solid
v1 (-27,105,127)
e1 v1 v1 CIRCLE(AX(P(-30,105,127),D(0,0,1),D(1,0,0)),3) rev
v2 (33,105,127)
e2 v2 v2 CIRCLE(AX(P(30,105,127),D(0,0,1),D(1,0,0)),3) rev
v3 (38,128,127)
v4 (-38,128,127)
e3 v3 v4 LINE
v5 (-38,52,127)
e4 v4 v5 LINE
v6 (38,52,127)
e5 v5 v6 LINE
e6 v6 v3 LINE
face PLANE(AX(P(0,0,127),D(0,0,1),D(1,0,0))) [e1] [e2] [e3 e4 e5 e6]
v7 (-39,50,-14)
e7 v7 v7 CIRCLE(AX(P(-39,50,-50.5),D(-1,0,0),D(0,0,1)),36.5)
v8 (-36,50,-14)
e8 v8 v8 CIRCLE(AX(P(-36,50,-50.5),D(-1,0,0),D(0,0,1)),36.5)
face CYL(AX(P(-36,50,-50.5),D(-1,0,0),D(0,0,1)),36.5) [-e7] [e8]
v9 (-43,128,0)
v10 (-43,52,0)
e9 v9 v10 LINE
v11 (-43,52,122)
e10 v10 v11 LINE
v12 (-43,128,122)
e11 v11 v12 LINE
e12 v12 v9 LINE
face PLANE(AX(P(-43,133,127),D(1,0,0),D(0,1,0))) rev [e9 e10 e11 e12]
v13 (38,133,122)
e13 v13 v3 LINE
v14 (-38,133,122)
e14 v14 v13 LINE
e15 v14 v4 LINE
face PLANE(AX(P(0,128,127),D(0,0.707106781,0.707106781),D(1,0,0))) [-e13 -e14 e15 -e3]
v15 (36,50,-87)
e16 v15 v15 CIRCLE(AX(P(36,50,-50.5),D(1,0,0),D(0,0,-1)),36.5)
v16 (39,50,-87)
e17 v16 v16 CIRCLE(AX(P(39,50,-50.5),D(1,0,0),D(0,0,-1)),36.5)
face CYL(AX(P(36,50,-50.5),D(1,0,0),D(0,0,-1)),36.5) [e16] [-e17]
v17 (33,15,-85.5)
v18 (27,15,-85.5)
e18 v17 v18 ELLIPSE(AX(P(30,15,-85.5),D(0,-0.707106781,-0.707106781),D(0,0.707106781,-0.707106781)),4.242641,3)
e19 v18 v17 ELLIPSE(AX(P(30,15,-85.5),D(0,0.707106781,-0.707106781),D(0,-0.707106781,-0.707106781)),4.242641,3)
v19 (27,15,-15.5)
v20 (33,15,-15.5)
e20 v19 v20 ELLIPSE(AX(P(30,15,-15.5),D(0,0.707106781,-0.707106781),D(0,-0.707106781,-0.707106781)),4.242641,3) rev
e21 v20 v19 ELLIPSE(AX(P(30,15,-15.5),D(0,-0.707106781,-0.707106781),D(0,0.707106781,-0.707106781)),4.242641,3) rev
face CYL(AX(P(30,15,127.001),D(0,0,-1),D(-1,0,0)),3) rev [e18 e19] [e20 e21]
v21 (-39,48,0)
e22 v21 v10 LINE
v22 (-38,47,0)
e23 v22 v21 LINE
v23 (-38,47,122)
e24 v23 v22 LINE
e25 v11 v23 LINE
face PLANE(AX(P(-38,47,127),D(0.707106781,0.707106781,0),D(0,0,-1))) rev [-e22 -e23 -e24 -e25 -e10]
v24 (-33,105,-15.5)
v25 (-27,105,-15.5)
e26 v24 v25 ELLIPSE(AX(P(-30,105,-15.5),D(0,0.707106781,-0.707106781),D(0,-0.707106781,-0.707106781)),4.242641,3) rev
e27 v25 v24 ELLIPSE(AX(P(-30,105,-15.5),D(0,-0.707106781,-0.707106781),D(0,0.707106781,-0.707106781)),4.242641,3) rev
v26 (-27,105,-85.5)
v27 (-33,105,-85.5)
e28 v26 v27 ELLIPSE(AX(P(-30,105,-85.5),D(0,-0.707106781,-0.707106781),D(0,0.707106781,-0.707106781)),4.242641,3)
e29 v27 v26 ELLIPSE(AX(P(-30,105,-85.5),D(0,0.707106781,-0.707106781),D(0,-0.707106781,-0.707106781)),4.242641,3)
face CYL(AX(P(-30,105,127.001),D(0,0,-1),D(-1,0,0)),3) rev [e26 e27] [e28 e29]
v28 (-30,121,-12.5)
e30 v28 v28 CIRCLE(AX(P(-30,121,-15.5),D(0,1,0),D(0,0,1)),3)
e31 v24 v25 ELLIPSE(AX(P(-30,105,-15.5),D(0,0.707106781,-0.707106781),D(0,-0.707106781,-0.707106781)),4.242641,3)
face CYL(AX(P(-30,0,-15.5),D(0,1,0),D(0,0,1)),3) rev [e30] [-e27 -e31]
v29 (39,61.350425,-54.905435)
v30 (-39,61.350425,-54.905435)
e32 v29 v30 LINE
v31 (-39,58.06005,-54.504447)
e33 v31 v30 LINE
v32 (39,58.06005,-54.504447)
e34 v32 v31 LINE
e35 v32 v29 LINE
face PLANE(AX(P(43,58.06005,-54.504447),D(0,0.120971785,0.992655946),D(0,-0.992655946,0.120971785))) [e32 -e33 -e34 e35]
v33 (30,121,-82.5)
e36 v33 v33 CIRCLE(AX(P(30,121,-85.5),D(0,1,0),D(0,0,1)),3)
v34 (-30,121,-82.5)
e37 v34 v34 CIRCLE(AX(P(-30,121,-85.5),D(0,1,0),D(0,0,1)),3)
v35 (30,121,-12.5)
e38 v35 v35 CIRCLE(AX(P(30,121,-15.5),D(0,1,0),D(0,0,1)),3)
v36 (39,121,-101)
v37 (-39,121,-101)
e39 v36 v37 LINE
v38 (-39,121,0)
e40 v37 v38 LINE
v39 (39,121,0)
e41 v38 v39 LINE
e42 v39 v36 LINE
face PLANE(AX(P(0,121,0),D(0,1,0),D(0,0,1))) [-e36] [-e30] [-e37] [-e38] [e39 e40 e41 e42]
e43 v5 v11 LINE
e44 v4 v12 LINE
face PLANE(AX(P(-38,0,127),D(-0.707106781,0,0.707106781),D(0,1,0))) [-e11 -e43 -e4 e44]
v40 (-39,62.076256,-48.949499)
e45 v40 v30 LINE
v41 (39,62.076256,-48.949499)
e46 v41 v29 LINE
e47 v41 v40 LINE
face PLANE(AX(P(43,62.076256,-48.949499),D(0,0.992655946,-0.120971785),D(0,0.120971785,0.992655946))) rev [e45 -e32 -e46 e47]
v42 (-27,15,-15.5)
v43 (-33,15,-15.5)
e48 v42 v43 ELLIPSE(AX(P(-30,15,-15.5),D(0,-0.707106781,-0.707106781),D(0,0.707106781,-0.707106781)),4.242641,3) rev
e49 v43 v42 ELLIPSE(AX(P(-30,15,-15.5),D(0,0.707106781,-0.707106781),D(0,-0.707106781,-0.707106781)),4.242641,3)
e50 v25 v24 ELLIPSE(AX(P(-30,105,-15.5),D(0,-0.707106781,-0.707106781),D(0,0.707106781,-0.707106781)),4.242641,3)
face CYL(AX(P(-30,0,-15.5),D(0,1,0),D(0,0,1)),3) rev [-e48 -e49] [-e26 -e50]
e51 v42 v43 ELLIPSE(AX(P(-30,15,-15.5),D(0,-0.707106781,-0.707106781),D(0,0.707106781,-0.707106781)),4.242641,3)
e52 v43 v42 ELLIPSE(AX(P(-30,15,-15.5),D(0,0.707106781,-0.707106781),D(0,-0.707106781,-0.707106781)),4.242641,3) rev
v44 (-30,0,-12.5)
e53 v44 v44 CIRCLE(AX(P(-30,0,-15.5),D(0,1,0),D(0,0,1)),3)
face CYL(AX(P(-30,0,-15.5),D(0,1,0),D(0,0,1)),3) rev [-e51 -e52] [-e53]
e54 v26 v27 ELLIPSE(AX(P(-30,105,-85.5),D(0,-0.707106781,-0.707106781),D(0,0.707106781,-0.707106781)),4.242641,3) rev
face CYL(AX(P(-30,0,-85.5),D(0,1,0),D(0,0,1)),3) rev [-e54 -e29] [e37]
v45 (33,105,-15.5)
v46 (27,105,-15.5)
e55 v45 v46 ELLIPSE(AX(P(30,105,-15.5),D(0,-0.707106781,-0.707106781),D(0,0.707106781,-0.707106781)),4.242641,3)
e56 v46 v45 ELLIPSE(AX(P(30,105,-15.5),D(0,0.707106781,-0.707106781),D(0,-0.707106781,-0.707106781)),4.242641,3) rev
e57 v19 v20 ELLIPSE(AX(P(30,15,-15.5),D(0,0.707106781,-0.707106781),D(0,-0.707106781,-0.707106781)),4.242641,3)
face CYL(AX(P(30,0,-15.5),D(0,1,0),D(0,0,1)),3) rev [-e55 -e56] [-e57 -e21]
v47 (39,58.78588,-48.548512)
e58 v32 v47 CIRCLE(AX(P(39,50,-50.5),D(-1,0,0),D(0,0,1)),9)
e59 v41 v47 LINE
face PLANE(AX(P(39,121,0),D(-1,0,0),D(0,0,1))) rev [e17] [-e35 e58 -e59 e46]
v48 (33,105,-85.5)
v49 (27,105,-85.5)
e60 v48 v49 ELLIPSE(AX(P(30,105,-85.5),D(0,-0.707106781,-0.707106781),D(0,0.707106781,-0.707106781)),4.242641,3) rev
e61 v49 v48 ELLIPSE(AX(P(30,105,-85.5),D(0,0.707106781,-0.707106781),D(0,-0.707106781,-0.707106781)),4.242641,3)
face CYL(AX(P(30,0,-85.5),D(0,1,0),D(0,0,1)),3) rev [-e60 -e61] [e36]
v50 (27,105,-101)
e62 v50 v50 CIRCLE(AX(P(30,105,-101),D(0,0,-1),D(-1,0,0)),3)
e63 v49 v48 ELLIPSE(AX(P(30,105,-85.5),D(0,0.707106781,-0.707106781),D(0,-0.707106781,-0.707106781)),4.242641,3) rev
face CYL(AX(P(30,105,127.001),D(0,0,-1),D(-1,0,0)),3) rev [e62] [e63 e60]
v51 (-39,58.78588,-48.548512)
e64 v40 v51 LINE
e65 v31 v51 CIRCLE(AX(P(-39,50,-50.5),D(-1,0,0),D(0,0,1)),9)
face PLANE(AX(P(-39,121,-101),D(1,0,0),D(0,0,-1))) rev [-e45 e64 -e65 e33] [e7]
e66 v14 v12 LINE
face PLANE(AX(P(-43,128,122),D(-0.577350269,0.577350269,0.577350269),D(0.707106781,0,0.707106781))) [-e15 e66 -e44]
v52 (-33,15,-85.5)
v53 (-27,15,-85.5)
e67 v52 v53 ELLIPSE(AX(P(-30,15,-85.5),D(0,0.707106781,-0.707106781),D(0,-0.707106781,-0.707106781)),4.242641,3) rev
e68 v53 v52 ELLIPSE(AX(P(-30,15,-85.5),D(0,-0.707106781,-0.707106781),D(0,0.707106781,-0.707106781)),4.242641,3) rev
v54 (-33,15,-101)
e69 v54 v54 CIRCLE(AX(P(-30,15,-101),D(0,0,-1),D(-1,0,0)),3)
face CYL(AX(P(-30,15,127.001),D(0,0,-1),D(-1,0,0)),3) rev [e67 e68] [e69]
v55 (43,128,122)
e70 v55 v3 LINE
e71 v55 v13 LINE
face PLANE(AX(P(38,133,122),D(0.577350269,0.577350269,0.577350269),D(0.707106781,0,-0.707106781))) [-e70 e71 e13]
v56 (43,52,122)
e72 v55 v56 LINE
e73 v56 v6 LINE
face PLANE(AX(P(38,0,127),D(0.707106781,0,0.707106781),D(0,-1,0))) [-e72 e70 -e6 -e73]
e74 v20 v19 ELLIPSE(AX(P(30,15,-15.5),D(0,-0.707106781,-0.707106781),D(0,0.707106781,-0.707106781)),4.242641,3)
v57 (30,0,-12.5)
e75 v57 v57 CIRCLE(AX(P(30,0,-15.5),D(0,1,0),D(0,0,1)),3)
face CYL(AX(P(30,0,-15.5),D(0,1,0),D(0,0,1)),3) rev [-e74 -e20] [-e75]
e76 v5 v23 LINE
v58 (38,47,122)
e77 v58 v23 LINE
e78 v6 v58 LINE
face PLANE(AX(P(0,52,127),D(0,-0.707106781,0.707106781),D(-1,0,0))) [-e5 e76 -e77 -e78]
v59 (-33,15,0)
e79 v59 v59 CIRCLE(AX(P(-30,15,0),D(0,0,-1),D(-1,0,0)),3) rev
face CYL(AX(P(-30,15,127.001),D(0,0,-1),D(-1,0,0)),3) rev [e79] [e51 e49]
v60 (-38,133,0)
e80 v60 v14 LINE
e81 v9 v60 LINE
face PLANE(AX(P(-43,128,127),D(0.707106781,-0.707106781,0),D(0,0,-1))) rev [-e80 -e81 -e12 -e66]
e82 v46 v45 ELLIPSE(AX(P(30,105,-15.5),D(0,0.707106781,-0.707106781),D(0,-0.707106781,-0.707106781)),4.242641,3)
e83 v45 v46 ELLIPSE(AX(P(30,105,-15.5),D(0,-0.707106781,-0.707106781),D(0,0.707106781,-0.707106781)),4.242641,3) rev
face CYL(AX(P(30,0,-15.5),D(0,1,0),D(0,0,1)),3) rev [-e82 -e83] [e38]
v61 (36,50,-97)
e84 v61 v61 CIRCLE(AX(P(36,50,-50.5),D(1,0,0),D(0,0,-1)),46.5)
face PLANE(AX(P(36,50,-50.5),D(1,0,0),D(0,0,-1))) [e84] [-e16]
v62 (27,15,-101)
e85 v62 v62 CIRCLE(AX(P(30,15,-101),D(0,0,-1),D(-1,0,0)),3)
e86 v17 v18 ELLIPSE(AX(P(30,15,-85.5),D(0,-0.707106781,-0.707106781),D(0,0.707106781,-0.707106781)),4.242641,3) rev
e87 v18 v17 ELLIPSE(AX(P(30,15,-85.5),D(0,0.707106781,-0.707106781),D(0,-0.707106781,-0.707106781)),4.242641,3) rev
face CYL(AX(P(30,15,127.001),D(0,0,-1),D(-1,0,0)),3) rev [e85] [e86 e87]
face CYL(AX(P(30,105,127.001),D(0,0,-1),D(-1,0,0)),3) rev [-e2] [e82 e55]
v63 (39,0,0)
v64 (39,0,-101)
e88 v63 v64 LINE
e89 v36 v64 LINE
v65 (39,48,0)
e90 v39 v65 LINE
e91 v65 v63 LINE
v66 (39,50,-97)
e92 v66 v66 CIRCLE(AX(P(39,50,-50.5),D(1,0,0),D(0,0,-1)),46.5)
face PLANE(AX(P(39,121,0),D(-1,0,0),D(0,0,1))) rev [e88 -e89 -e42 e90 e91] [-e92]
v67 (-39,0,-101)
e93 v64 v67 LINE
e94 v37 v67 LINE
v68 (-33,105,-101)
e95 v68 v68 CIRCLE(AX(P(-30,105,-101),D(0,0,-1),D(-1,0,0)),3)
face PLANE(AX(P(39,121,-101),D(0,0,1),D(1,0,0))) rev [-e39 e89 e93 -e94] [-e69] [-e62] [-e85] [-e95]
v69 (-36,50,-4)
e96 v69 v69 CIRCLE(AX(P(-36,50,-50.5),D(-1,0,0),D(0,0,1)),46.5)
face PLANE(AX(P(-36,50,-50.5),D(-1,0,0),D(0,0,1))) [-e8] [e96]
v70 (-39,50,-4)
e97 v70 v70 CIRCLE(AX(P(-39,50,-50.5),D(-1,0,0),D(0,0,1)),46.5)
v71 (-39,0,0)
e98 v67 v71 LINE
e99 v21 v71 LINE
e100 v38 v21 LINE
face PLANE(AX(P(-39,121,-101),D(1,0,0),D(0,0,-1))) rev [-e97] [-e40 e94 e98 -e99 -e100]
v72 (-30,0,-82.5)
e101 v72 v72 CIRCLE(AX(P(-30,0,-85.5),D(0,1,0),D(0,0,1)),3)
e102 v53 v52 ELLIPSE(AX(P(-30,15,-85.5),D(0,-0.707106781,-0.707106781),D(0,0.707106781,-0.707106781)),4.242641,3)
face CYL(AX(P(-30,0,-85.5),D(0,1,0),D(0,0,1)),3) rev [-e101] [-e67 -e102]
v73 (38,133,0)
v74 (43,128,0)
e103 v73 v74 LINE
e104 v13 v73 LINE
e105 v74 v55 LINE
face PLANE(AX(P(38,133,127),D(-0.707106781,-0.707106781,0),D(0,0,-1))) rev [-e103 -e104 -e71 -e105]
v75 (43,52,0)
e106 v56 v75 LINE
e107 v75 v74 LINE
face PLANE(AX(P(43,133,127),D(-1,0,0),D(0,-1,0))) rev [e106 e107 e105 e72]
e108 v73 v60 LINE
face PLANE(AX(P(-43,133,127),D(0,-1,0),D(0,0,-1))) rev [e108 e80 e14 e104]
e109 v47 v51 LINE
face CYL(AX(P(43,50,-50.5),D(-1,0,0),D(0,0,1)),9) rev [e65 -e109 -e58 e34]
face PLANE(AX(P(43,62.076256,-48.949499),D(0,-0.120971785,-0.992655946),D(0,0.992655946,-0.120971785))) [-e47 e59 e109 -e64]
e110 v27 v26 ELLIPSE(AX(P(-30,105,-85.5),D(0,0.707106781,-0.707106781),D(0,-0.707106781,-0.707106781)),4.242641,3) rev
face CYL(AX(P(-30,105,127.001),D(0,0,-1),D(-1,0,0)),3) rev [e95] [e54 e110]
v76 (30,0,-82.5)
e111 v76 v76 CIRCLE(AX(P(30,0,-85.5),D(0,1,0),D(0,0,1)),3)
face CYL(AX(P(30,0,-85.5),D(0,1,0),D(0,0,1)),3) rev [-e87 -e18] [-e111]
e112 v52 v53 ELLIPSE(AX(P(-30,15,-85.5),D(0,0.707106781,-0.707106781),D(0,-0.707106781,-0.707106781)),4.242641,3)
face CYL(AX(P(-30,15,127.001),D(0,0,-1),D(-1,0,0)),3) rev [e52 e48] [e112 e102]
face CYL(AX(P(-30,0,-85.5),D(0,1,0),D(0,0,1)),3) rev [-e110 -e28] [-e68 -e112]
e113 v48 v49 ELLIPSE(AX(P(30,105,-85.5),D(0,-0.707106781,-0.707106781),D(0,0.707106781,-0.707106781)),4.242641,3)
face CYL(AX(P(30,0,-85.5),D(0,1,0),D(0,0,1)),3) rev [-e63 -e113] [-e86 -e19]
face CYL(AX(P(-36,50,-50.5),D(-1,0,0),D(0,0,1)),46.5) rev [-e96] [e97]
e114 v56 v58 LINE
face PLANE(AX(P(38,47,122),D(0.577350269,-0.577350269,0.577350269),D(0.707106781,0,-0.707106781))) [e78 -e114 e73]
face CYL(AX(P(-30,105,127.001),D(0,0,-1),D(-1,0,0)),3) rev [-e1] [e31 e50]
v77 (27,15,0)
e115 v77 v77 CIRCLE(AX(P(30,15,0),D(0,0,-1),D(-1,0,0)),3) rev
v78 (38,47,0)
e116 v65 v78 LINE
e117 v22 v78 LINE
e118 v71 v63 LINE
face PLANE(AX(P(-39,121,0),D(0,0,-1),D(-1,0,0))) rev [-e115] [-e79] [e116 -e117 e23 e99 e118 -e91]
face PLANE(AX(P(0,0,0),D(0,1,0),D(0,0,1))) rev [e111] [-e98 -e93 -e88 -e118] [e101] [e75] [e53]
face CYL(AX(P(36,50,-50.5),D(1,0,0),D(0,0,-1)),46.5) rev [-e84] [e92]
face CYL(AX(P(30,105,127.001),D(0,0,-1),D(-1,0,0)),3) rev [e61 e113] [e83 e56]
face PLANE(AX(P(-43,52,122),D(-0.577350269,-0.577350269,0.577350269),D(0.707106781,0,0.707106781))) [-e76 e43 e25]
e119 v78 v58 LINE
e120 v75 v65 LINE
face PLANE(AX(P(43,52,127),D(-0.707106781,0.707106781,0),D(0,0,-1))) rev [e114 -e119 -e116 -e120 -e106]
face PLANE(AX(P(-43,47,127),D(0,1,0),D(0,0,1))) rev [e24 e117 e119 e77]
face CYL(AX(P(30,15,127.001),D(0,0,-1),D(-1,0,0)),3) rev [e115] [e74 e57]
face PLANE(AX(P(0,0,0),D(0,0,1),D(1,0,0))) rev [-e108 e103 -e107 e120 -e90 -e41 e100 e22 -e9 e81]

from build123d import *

# Parameters (mm, degrees)
SKETCH_1_W               = 78
SKETCH_1_H               = 101
EXTRUDE_1_DEPTH          = 121
SKETCH_4_W               = 86
SKETCH_4_H               = 86
EXTRUDE_2_DEPTH          = 127
CUT_EXTRUDE_1_DEPTH      = 189.857088826
CUT_EXTRUDE_1_DEPTH_BACK = 189.857088826
SKETCH_5_R               = 7
CHAMFER_1_SIZE           = 5
CUT_EXTRUDE_2_REACH      = 269.436
SKETCH_6_R               = 3
SKETCH_7_R               = 3
CUT_EXTRUDE_3_DEPTH      = 181.607308822
SKETCH_8_R               = 46.5
SKETCH_8_R_2             = 36.5
CUT_EXTRUDE_1_2_DEPTH    = 3
CUT_EXTRUDE_START        = -3
SKETCH_9_R               = 46.5
SKETCH_9_R_2             = 36.5
CUT_EXTRUDE_2_2_DEPTH    = 3
KEYWAY_DEPTH             = 214.350603768


with BuildPart() as part:
    # 草图1 → 凸台-拉伸1 (new body)
    with BuildSketch(Plane(origin=(0, 0, 0), x_dir=(1, 0, 0), z_dir=(0, 1, 0))):
        with Locations((0, 50.5)):
            Rectangle(SKETCH_1_W, SKETCH_1_H)
    extrude(amount=EXTRUDE_1_DEPTH)

    # 草图4 → 凸台-拉伸2 (add)
    with BuildSketch(Plane.XY):
        with Locations((0, 90)):
            Rectangle(SKETCH_4_W, SKETCH_4_H)
    extrude(amount=EXTRUDE_2_DEPTH)

    # 草图5 → Cut-Extrude 1 (cut, two sides: drawn at the far end of the back side and taken through both)
    with BuildSketch(Plane(origin=(0, 0, 0), x_dir=(0, 0, -1), z_dir=(1, 0, 0)).offset(-CUT_EXTRUDE_1_DEPTH_BACK)):
        with Locations(Location((50.5, 50, 0), (0, 0, 180))):
            Circle(SKETCH_5_R)
    extrude(amount=CUT_EXTRUDE_1_DEPTH + CUT_EXTRUDE_1_DEPTH_BACK, mode=Mode.SUBTRACT)

    # 倒角1
    # the kernel refuses this chamfer: 5 mm, written as the material it takes off along each edge
    with BuildSketch(Plane(origin=(39.666666667, 50.333333333, 123.666666667), x_dir=(0.7071067811865475, -2.009718347115232e-15, -0.7071067811865475), z_dir=(0.5773502691896247, -0.5773502691896264, 0.5773502691896264)), Plane(origin=(39.666666667, 129.666666667, 123.666666667), x_dir=(-0.7071067811865475, 2.009718347115232e-15, 0.7071067811865475), z_dir=(0.5773502691896272, 0.5773502691896246, 0.5773502691896255))) as chamfer_1_piece_1:
        Polygon((-3.535533906, 2.041241452), (3.535533906, 2.041241452), (0, -4.082482905), align=None)
    extrude(amount=6.350852961, mode=Mode.SUBTRACT)
    with BuildSketch(Plane(origin=(-39.666666667, 129.666666667, 123.666666667), x_dir=(0.7071067811865475, 0, 0.7071067811865475), z_dir=(-0.5773502691896257, 0.5773502691896257, 0.5773502691896257)), Plane(origin=(-39.666666667, 50.333333333, 123.666666667), x_dir=(-0.7071067811865475, 0, -0.7071067811865475), z_dir=(-0.5773502691896261, -0.5773502691896253, 0.5773502691896261))) as chamfer_1_piece_2:
        Polygon((-3.535533906, -2.041241452), (3.535533906, -2.041241452), (0, 4.082482905), align=None)
    extrude(amount=6.350852961, mode=Mode.SUBTRACT)
    with BuildSketch(Plane(origin=(43, 47, 0), x_dir=(-0.9996219169112968, -0.027495876610586317, 0), z_dir=(0, 0, 1))) as chamfer_1_piece_3:
        Polygon((CHAMFER_1_SIZE * 0.999621916911, -CHAMFER_1_SIZE * 0.0274958766106), (-CHAMFER_1_SIZE * 0.0274958766106, -CHAMFER_1_SIZE * 0.999621916911), (0, 0), align=None)
    extrude(amount=139.85841494, mode=Mode.SUBTRACT)
    with BuildSketch(Plane(origin=(43, 133, -12.85841494), x_dir=(0.027495876610586206, -0.9996219169112968, 0), z_dir=(0, 0, 1))) as chamfer_1_piece_4:
        Polygon((CHAMFER_1_SIZE * 0.999621916911, -CHAMFER_1_SIZE * 0.0274958766106), (-CHAMFER_1_SIZE * 0.0274958766106, -CHAMFER_1_SIZE * 0.999621916911), (0, 0), align=None)
    extrude(amount=152.71682988, mode=Mode.SUBTRACT)
    with BuildSketch(Plane(origin=(-43, 133, -12.85841494), x_dir=(-0.027495876610586355, -0.9996219169112968, 0), z_dir=(0, 0, 1))) as chamfer_1_piece_5:
        Polygon((CHAMFER_1_SIZE * 0.999621916911, CHAMFER_1_SIZE * 0.0274958766106), (-CHAMFER_1_SIZE * 0.0274958766106, CHAMFER_1_SIZE * 0.999621916911), (0, 0), align=None)
    extrude(amount=152.71682988, mode=Mode.SUBTRACT)
    with BuildSketch(Plane(origin=(-43, 47, 0), x_dir=(0.9996219169112968, -0.027495876610586355, 0), z_dir=(0, 0, 1))) as chamfer_1_piece_6:
        Polygon((CHAMFER_1_SIZE * 0.999621916911, CHAMFER_1_SIZE * 0.0274958766106), (-CHAMFER_1_SIZE * 0.0274958766106, CHAMFER_1_SIZE * 0.999621916911), (0, 0), align=None)
    extrude(amount=139.85841494, mode=Mode.SUBTRACT)
    with BuildSketch(Plane(origin=(43, 145.85841494, 127), x_dir=(0.027495876610586282, 0, -0.9996219169112968), z_dir=(0, -1, 0)), Plane(origin=(-43, 34.14158506, 127), x_dir=(-0.027495876610586282, 0, -0.9996219169112968), z_dir=(0, 1, 0)), Plane(origin=(55.85841494, 47, 127), x_dir=(0, -0.027495876610586282, -0.9996219169112968), z_dir=(-1, 0, 0))) as chamfer_1_piece_7:
        Polygon((CHAMFER_1_SIZE * 0.999621916911, -CHAMFER_1_SIZE * 0.0274958766106), (-CHAMFER_1_SIZE * 0.0274958766106, -CHAMFER_1_SIZE * 0.999621916911), (0, 0), align=None)
    extrude(amount=111.71682988, mode=Mode.SUBTRACT)
    with BuildSketch(Plane(origin=(-55.85841494, 133, 127), x_dir=(0, -0.9996219169112968, 0.027495876610587663), z_dir=(1, 0, 0))) as chamfer_1_piece_8:
        Polygon((CHAMFER_1_SIZE * 0.999621916911, CHAMFER_1_SIZE * 0.0274958766106), (-CHAMFER_1_SIZE * 0.0274958766106, CHAMFER_1_SIZE * 0.999621916911), (0, 0), align=None)
    extrude(amount=111.71682988, mode=Mode.SUBTRACT)

    # 草图6 → Cut-Extrude 2 (cut, up to next)
    with BuildSketch(Plane(origin=(0, 0, -101), x_dir=(-1, 0, 0), z_dir=(0, 0, -1)), mode=Mode.PRIVATE) as cut_extrude_2_sk1:
        with Locations((-30, 15)):
            Circle(SKETCH_6_R)
    cut_extrude_2_tool1 = extrude(cut_extrude_2_sk1.sketch, amount=-CUT_EXTRUDE_2_REACH, mode=Mode.PRIVATE) & part.part
    # 草图6 → Cut-Extrude 2 (cut, up to next)
    with BuildSketch(Plane(origin=(0, 0, -101), x_dir=(-1, 0, 0), z_dir=(0, 0, -1)), mode=Mode.PRIVATE) as cut_extrude_2_sk2:
        with Locations((30, 15)):
            Circle(SKETCH_6_R)
    cut_extrude_2_tool2 = extrude(cut_extrude_2_sk2.sketch, amount=-CUT_EXTRUDE_2_REACH, mode=Mode.PRIVATE) & part.part
    # 草图6 → Cut-Extrude 2 (cut, up to next)
    with BuildSketch(Plane(origin=(0, 0, -101), x_dir=(-1, 0, 0), z_dir=(0, 0, -1)), mode=Mode.PRIVATE) as cut_extrude_2_sk3:
        with Locations((-30, 105)):
            Circle(SKETCH_6_R)
    cut_extrude_2_tool3 = extrude(cut_extrude_2_sk3.sketch, amount=-CUT_EXTRUDE_2_REACH, mode=Mode.PRIVATE) & part.part
    # 草图6 → Cut-Extrude 2 (cut, up to next)
    with BuildSketch(Plane(origin=(0, 0, -101), x_dir=(-1, 0, 0), z_dir=(0, 0, -1)), mode=Mode.PRIVATE) as cut_extrude_2_sk4:
        with Locations((30, 105)):
            Circle(SKETCH_6_R)
    cut_extrude_2_tool4 = extrude(cut_extrude_2_sk4.sketch, amount=-CUT_EXTRUDE_2_REACH, mode=Mode.PRIVATE) & part.part
    add(cut_extrude_2_tool1.solids().sort_by_distance((30, 15, -101))[0], mode=Mode.SUBTRACT)
    add(cut_extrude_2_tool2.solids().sort_by_distance((-30, 15, -101))[0], mode=Mode.SUBTRACT)
    add(cut_extrude_2_tool3.solids().sort_by_distance((30, 105, -101))[0], mode=Mode.SUBTRACT)
    add(cut_extrude_2_tool4.solids().sort_by_distance((-30, 105, -101))[0], mode=Mode.SUBTRACT)

    # 草图7 → 切除-拉伸3 (cut, through all)
    with BuildSketch(Plane(origin=(0, 121, 0), x_dir=(1, 0, 0), z_dir=(0, 1, 0))):
        with Locations((30, 85.5)):
            Circle(SKETCH_7_R)
        with Locations((30, 15.5)):
            Circle(SKETCH_7_R)
        with Locations((-30, 15.5)):
            Circle(SKETCH_7_R)
        with Locations((-30, 85.5)):
            Circle(SKETCH_7_R)
    extrude(amount=-CUT_EXTRUDE_3_DEPTH, mode=Mode.SUBTRACT)

    # 草图8 → Cut-Extrude 1 2 (cut)
    with BuildSketch(Plane.ZY.offset(39)):
        with Locations((-50.5, 50)):
            Circle(SKETCH_8_R)
        with Locations((-50.5, 50)):
            Circle(SKETCH_8_R_2, mode=Mode.SUBTRACT)
    extrude(amount=-CUT_EXTRUDE_1_2_DEPTH, mode=Mode.SUBTRACT)

    # 草图9 → Cut-Extrude 2 2 (cut)
    with BuildSketch(Plane(origin=(39, 0, 0), x_dir=(0, 0, -1), z_dir=(1, 0, 0)).offset(CUT_EXTRUDE_START)):
        with Locations((50.5, 50)):
            Circle(SKETCH_9_R)
        with Locations((50.5, 50)):
            Circle(SKETCH_9_R_2, mode=Mode.SUBTRACT)
    extrude(amount=CUT_EXTRUDE_2_2_DEPTH, mode=Mode.SUBTRACT)

    # KeySketch → Keyway (cut, through all)
    with BuildSketch(Plane(origin=(-39, 56.979737296, -54.70140282), x_dir=(0, 0, 1), z_dir=(-1, 0, 0))):
        with BuildLine():
            Line((0.196955351, 1.08031236), (-0.204032077, 4.370687514))
            Line((-0.204032077, 4.370687514), (5.7519036, 5.096518221))
            Line((5.7519036, 5.096518221), (6.152891028, 1.806143068))
            ThreePointArc((6.152891028, 1.806143068), (5.290148882, -15.913640811), (0.196955351, 1.08031236))
        make_face()
    extrude(amount=-KEYWAY_DEPTH, mode=Mode.SUBTRACT)


solid = part.part
